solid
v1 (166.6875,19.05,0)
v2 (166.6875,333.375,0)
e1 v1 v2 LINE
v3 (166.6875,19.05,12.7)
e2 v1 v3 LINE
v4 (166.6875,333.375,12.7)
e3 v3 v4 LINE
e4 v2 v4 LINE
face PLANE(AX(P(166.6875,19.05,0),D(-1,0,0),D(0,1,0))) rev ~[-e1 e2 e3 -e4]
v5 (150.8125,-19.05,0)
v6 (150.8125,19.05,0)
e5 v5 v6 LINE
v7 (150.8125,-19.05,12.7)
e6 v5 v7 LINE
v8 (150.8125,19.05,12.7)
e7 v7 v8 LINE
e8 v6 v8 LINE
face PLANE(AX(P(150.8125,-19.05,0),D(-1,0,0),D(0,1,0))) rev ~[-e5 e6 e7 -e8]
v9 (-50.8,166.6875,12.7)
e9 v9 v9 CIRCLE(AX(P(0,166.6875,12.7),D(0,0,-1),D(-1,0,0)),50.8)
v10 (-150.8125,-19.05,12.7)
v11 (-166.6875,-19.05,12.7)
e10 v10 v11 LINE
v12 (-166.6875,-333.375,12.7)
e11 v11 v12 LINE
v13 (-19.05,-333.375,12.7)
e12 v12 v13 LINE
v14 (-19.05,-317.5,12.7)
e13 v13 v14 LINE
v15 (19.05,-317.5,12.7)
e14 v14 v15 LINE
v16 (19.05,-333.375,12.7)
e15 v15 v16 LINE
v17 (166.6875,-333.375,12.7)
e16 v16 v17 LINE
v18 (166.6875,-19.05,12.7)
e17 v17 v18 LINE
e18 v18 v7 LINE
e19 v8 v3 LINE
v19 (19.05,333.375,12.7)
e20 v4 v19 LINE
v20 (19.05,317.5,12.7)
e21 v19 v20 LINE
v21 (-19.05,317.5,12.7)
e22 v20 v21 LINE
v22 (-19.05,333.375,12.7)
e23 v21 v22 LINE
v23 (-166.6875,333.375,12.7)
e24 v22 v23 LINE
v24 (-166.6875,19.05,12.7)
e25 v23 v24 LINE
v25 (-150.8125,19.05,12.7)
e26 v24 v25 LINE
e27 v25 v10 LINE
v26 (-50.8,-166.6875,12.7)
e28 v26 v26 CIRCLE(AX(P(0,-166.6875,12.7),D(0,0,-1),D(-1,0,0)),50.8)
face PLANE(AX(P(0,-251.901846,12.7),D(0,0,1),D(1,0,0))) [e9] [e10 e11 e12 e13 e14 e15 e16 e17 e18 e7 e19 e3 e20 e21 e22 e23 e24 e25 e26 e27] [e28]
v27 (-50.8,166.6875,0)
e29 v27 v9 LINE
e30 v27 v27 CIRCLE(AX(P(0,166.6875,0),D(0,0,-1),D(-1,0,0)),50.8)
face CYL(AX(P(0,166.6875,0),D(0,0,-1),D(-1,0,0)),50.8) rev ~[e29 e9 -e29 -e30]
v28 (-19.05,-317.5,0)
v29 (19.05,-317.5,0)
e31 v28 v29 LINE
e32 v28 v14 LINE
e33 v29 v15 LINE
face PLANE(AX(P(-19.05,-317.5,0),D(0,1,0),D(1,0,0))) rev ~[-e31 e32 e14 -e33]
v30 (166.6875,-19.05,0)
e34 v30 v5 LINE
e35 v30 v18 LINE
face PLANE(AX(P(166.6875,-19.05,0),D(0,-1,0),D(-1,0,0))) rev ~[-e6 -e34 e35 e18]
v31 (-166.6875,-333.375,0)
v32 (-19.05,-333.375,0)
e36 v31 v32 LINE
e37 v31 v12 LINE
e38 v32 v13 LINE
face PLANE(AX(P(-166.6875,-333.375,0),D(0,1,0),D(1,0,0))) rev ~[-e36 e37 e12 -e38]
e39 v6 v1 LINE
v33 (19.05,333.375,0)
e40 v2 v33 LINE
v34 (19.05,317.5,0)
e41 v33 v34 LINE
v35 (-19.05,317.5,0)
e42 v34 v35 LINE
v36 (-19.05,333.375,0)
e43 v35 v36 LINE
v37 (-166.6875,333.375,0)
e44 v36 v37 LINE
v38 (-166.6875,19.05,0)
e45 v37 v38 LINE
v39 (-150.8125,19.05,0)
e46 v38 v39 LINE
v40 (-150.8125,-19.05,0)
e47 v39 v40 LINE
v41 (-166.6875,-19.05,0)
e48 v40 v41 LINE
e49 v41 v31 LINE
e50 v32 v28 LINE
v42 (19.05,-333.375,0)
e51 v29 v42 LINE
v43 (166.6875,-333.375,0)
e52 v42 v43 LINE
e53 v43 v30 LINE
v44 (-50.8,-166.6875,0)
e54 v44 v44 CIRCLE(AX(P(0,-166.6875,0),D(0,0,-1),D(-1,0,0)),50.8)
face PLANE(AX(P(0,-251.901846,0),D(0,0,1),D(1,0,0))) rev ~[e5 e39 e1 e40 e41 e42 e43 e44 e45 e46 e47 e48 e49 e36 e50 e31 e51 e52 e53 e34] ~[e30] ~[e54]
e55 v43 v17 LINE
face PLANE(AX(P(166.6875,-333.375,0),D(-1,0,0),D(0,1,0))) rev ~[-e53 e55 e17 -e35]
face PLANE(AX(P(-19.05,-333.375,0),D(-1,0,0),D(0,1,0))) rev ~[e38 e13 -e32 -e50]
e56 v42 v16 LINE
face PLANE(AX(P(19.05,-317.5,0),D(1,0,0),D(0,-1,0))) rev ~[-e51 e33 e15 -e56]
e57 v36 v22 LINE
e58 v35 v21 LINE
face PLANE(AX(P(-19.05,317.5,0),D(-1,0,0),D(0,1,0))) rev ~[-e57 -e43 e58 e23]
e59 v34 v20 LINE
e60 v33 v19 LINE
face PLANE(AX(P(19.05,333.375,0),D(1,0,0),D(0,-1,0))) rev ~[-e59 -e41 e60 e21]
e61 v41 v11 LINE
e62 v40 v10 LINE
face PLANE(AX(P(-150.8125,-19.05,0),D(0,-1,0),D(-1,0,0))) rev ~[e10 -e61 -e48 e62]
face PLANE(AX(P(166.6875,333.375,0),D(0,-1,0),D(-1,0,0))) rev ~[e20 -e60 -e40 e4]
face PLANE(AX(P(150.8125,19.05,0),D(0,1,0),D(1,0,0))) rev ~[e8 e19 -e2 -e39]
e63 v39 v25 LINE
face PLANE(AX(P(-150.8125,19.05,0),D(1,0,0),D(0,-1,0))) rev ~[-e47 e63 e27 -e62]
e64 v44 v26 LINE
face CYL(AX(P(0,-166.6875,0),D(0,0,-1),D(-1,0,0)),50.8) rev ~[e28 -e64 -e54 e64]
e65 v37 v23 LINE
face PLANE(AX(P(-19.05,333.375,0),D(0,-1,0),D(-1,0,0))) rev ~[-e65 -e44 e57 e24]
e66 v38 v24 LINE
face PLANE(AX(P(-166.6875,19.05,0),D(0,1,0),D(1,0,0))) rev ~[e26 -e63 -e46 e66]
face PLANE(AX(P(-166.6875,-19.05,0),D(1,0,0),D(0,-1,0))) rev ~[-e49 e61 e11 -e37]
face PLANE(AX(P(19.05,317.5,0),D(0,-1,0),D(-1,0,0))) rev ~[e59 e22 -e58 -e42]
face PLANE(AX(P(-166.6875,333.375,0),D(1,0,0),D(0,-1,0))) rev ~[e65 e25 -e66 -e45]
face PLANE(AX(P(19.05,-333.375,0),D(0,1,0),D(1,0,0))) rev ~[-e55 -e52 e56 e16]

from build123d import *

# Parameters (mm, degrees)
F1_DEPTH = 12.7


with BuildPart() as f1:
    # F0 (on Top) → F1 (new body)
    with BuildSketch(Plane.XY):
        with BuildLine():
            Line((166.6875, -333.375), (166.6875, -166.6875))
            Line((166.6875, -166.6875), (50.8, -166.6875))
            ThreePointArc((50.8, -166.6875), (0, -217.4875), (-50.8, -166.6875))
            Line((-50.8, -166.6875), (-166.6875, -166.6875))
            Line((-166.6875, -166.6875), (-166.6875, -333.375))
            Line((-166.6875, -333.375), (-19.05, -333.375))
            Line((-19.05, -333.375), (-19.05, -317.5))
            Line((-19.05, -317.5), (19.05, -317.5))
            Line((19.05, -317.5), (19.05, -333.375))
            Line((19.05, -333.375), (166.6875, -333.375))
        make_face()
        with BuildLine():
            Line((50.8, 166.6875), (166.6875, 166.6875))
            Line((166.6875, 166.6875), (166.6875, 333.375))
            Line((166.6875, 333.375), (19.05, 333.375))
            Line((19.05, 333.375), (19.05, 317.5))
            Line((19.05, 317.5), (-19.05, 317.5))
            Line((-19.05, 317.5), (-19.05, 333.375))
            Line((-19.05, 333.375), (-166.6875, 333.375))
            Line((-166.6875, 333.375), (-166.6875, 166.6875))
            Line((-166.6875, 166.6875), (-50.8, 166.6875))
            ThreePointArc((-50.8, 166.6875), (0, 217.4875), (50.8, 166.6875))
        make_face()
        with BuildLine():
            Line((50.8, -166.6875), (166.6875, -166.6875))
            Line((166.6875, -166.6875), (166.6875, -19.05))
            Line((166.6875, -19.05), (150.8125, -19.05))
            Line((150.8125, -19.05), (150.8125, 19.05))
            Line((150.8125, 19.05), (166.6875, 19.05))
            Line((166.6875, 19.05), (166.6875, 166.6875))
            Line((166.6875, 166.6875), (50.8, 166.6875))
            ThreePointArc((50.8, 166.6875), (0, 115.8875), (-50.8, 166.6875))
            Line((-50.8, 166.6875), (-166.6875, 166.6875))
            Line((-166.6875, 166.6875), (-166.6875, 19.05))
            Line((-166.6875, 19.05), (-150.8125, 19.05))
            Line((-150.8125, 19.05), (-150.8125, -19.05))
            Line((-150.8125, -19.05), (-166.6875, -19.05))
            Line((-166.6875, -19.05), (-166.6875, -166.6875))
            Line((-166.6875, -166.6875), (-50.8, -166.6875))
            ThreePointArc((-50.8, -166.6875), (0, -115.8875), (50.8, -166.6875))
        make_face()
    extrude(amount=F1_DEPTH)


solid = f1.part
